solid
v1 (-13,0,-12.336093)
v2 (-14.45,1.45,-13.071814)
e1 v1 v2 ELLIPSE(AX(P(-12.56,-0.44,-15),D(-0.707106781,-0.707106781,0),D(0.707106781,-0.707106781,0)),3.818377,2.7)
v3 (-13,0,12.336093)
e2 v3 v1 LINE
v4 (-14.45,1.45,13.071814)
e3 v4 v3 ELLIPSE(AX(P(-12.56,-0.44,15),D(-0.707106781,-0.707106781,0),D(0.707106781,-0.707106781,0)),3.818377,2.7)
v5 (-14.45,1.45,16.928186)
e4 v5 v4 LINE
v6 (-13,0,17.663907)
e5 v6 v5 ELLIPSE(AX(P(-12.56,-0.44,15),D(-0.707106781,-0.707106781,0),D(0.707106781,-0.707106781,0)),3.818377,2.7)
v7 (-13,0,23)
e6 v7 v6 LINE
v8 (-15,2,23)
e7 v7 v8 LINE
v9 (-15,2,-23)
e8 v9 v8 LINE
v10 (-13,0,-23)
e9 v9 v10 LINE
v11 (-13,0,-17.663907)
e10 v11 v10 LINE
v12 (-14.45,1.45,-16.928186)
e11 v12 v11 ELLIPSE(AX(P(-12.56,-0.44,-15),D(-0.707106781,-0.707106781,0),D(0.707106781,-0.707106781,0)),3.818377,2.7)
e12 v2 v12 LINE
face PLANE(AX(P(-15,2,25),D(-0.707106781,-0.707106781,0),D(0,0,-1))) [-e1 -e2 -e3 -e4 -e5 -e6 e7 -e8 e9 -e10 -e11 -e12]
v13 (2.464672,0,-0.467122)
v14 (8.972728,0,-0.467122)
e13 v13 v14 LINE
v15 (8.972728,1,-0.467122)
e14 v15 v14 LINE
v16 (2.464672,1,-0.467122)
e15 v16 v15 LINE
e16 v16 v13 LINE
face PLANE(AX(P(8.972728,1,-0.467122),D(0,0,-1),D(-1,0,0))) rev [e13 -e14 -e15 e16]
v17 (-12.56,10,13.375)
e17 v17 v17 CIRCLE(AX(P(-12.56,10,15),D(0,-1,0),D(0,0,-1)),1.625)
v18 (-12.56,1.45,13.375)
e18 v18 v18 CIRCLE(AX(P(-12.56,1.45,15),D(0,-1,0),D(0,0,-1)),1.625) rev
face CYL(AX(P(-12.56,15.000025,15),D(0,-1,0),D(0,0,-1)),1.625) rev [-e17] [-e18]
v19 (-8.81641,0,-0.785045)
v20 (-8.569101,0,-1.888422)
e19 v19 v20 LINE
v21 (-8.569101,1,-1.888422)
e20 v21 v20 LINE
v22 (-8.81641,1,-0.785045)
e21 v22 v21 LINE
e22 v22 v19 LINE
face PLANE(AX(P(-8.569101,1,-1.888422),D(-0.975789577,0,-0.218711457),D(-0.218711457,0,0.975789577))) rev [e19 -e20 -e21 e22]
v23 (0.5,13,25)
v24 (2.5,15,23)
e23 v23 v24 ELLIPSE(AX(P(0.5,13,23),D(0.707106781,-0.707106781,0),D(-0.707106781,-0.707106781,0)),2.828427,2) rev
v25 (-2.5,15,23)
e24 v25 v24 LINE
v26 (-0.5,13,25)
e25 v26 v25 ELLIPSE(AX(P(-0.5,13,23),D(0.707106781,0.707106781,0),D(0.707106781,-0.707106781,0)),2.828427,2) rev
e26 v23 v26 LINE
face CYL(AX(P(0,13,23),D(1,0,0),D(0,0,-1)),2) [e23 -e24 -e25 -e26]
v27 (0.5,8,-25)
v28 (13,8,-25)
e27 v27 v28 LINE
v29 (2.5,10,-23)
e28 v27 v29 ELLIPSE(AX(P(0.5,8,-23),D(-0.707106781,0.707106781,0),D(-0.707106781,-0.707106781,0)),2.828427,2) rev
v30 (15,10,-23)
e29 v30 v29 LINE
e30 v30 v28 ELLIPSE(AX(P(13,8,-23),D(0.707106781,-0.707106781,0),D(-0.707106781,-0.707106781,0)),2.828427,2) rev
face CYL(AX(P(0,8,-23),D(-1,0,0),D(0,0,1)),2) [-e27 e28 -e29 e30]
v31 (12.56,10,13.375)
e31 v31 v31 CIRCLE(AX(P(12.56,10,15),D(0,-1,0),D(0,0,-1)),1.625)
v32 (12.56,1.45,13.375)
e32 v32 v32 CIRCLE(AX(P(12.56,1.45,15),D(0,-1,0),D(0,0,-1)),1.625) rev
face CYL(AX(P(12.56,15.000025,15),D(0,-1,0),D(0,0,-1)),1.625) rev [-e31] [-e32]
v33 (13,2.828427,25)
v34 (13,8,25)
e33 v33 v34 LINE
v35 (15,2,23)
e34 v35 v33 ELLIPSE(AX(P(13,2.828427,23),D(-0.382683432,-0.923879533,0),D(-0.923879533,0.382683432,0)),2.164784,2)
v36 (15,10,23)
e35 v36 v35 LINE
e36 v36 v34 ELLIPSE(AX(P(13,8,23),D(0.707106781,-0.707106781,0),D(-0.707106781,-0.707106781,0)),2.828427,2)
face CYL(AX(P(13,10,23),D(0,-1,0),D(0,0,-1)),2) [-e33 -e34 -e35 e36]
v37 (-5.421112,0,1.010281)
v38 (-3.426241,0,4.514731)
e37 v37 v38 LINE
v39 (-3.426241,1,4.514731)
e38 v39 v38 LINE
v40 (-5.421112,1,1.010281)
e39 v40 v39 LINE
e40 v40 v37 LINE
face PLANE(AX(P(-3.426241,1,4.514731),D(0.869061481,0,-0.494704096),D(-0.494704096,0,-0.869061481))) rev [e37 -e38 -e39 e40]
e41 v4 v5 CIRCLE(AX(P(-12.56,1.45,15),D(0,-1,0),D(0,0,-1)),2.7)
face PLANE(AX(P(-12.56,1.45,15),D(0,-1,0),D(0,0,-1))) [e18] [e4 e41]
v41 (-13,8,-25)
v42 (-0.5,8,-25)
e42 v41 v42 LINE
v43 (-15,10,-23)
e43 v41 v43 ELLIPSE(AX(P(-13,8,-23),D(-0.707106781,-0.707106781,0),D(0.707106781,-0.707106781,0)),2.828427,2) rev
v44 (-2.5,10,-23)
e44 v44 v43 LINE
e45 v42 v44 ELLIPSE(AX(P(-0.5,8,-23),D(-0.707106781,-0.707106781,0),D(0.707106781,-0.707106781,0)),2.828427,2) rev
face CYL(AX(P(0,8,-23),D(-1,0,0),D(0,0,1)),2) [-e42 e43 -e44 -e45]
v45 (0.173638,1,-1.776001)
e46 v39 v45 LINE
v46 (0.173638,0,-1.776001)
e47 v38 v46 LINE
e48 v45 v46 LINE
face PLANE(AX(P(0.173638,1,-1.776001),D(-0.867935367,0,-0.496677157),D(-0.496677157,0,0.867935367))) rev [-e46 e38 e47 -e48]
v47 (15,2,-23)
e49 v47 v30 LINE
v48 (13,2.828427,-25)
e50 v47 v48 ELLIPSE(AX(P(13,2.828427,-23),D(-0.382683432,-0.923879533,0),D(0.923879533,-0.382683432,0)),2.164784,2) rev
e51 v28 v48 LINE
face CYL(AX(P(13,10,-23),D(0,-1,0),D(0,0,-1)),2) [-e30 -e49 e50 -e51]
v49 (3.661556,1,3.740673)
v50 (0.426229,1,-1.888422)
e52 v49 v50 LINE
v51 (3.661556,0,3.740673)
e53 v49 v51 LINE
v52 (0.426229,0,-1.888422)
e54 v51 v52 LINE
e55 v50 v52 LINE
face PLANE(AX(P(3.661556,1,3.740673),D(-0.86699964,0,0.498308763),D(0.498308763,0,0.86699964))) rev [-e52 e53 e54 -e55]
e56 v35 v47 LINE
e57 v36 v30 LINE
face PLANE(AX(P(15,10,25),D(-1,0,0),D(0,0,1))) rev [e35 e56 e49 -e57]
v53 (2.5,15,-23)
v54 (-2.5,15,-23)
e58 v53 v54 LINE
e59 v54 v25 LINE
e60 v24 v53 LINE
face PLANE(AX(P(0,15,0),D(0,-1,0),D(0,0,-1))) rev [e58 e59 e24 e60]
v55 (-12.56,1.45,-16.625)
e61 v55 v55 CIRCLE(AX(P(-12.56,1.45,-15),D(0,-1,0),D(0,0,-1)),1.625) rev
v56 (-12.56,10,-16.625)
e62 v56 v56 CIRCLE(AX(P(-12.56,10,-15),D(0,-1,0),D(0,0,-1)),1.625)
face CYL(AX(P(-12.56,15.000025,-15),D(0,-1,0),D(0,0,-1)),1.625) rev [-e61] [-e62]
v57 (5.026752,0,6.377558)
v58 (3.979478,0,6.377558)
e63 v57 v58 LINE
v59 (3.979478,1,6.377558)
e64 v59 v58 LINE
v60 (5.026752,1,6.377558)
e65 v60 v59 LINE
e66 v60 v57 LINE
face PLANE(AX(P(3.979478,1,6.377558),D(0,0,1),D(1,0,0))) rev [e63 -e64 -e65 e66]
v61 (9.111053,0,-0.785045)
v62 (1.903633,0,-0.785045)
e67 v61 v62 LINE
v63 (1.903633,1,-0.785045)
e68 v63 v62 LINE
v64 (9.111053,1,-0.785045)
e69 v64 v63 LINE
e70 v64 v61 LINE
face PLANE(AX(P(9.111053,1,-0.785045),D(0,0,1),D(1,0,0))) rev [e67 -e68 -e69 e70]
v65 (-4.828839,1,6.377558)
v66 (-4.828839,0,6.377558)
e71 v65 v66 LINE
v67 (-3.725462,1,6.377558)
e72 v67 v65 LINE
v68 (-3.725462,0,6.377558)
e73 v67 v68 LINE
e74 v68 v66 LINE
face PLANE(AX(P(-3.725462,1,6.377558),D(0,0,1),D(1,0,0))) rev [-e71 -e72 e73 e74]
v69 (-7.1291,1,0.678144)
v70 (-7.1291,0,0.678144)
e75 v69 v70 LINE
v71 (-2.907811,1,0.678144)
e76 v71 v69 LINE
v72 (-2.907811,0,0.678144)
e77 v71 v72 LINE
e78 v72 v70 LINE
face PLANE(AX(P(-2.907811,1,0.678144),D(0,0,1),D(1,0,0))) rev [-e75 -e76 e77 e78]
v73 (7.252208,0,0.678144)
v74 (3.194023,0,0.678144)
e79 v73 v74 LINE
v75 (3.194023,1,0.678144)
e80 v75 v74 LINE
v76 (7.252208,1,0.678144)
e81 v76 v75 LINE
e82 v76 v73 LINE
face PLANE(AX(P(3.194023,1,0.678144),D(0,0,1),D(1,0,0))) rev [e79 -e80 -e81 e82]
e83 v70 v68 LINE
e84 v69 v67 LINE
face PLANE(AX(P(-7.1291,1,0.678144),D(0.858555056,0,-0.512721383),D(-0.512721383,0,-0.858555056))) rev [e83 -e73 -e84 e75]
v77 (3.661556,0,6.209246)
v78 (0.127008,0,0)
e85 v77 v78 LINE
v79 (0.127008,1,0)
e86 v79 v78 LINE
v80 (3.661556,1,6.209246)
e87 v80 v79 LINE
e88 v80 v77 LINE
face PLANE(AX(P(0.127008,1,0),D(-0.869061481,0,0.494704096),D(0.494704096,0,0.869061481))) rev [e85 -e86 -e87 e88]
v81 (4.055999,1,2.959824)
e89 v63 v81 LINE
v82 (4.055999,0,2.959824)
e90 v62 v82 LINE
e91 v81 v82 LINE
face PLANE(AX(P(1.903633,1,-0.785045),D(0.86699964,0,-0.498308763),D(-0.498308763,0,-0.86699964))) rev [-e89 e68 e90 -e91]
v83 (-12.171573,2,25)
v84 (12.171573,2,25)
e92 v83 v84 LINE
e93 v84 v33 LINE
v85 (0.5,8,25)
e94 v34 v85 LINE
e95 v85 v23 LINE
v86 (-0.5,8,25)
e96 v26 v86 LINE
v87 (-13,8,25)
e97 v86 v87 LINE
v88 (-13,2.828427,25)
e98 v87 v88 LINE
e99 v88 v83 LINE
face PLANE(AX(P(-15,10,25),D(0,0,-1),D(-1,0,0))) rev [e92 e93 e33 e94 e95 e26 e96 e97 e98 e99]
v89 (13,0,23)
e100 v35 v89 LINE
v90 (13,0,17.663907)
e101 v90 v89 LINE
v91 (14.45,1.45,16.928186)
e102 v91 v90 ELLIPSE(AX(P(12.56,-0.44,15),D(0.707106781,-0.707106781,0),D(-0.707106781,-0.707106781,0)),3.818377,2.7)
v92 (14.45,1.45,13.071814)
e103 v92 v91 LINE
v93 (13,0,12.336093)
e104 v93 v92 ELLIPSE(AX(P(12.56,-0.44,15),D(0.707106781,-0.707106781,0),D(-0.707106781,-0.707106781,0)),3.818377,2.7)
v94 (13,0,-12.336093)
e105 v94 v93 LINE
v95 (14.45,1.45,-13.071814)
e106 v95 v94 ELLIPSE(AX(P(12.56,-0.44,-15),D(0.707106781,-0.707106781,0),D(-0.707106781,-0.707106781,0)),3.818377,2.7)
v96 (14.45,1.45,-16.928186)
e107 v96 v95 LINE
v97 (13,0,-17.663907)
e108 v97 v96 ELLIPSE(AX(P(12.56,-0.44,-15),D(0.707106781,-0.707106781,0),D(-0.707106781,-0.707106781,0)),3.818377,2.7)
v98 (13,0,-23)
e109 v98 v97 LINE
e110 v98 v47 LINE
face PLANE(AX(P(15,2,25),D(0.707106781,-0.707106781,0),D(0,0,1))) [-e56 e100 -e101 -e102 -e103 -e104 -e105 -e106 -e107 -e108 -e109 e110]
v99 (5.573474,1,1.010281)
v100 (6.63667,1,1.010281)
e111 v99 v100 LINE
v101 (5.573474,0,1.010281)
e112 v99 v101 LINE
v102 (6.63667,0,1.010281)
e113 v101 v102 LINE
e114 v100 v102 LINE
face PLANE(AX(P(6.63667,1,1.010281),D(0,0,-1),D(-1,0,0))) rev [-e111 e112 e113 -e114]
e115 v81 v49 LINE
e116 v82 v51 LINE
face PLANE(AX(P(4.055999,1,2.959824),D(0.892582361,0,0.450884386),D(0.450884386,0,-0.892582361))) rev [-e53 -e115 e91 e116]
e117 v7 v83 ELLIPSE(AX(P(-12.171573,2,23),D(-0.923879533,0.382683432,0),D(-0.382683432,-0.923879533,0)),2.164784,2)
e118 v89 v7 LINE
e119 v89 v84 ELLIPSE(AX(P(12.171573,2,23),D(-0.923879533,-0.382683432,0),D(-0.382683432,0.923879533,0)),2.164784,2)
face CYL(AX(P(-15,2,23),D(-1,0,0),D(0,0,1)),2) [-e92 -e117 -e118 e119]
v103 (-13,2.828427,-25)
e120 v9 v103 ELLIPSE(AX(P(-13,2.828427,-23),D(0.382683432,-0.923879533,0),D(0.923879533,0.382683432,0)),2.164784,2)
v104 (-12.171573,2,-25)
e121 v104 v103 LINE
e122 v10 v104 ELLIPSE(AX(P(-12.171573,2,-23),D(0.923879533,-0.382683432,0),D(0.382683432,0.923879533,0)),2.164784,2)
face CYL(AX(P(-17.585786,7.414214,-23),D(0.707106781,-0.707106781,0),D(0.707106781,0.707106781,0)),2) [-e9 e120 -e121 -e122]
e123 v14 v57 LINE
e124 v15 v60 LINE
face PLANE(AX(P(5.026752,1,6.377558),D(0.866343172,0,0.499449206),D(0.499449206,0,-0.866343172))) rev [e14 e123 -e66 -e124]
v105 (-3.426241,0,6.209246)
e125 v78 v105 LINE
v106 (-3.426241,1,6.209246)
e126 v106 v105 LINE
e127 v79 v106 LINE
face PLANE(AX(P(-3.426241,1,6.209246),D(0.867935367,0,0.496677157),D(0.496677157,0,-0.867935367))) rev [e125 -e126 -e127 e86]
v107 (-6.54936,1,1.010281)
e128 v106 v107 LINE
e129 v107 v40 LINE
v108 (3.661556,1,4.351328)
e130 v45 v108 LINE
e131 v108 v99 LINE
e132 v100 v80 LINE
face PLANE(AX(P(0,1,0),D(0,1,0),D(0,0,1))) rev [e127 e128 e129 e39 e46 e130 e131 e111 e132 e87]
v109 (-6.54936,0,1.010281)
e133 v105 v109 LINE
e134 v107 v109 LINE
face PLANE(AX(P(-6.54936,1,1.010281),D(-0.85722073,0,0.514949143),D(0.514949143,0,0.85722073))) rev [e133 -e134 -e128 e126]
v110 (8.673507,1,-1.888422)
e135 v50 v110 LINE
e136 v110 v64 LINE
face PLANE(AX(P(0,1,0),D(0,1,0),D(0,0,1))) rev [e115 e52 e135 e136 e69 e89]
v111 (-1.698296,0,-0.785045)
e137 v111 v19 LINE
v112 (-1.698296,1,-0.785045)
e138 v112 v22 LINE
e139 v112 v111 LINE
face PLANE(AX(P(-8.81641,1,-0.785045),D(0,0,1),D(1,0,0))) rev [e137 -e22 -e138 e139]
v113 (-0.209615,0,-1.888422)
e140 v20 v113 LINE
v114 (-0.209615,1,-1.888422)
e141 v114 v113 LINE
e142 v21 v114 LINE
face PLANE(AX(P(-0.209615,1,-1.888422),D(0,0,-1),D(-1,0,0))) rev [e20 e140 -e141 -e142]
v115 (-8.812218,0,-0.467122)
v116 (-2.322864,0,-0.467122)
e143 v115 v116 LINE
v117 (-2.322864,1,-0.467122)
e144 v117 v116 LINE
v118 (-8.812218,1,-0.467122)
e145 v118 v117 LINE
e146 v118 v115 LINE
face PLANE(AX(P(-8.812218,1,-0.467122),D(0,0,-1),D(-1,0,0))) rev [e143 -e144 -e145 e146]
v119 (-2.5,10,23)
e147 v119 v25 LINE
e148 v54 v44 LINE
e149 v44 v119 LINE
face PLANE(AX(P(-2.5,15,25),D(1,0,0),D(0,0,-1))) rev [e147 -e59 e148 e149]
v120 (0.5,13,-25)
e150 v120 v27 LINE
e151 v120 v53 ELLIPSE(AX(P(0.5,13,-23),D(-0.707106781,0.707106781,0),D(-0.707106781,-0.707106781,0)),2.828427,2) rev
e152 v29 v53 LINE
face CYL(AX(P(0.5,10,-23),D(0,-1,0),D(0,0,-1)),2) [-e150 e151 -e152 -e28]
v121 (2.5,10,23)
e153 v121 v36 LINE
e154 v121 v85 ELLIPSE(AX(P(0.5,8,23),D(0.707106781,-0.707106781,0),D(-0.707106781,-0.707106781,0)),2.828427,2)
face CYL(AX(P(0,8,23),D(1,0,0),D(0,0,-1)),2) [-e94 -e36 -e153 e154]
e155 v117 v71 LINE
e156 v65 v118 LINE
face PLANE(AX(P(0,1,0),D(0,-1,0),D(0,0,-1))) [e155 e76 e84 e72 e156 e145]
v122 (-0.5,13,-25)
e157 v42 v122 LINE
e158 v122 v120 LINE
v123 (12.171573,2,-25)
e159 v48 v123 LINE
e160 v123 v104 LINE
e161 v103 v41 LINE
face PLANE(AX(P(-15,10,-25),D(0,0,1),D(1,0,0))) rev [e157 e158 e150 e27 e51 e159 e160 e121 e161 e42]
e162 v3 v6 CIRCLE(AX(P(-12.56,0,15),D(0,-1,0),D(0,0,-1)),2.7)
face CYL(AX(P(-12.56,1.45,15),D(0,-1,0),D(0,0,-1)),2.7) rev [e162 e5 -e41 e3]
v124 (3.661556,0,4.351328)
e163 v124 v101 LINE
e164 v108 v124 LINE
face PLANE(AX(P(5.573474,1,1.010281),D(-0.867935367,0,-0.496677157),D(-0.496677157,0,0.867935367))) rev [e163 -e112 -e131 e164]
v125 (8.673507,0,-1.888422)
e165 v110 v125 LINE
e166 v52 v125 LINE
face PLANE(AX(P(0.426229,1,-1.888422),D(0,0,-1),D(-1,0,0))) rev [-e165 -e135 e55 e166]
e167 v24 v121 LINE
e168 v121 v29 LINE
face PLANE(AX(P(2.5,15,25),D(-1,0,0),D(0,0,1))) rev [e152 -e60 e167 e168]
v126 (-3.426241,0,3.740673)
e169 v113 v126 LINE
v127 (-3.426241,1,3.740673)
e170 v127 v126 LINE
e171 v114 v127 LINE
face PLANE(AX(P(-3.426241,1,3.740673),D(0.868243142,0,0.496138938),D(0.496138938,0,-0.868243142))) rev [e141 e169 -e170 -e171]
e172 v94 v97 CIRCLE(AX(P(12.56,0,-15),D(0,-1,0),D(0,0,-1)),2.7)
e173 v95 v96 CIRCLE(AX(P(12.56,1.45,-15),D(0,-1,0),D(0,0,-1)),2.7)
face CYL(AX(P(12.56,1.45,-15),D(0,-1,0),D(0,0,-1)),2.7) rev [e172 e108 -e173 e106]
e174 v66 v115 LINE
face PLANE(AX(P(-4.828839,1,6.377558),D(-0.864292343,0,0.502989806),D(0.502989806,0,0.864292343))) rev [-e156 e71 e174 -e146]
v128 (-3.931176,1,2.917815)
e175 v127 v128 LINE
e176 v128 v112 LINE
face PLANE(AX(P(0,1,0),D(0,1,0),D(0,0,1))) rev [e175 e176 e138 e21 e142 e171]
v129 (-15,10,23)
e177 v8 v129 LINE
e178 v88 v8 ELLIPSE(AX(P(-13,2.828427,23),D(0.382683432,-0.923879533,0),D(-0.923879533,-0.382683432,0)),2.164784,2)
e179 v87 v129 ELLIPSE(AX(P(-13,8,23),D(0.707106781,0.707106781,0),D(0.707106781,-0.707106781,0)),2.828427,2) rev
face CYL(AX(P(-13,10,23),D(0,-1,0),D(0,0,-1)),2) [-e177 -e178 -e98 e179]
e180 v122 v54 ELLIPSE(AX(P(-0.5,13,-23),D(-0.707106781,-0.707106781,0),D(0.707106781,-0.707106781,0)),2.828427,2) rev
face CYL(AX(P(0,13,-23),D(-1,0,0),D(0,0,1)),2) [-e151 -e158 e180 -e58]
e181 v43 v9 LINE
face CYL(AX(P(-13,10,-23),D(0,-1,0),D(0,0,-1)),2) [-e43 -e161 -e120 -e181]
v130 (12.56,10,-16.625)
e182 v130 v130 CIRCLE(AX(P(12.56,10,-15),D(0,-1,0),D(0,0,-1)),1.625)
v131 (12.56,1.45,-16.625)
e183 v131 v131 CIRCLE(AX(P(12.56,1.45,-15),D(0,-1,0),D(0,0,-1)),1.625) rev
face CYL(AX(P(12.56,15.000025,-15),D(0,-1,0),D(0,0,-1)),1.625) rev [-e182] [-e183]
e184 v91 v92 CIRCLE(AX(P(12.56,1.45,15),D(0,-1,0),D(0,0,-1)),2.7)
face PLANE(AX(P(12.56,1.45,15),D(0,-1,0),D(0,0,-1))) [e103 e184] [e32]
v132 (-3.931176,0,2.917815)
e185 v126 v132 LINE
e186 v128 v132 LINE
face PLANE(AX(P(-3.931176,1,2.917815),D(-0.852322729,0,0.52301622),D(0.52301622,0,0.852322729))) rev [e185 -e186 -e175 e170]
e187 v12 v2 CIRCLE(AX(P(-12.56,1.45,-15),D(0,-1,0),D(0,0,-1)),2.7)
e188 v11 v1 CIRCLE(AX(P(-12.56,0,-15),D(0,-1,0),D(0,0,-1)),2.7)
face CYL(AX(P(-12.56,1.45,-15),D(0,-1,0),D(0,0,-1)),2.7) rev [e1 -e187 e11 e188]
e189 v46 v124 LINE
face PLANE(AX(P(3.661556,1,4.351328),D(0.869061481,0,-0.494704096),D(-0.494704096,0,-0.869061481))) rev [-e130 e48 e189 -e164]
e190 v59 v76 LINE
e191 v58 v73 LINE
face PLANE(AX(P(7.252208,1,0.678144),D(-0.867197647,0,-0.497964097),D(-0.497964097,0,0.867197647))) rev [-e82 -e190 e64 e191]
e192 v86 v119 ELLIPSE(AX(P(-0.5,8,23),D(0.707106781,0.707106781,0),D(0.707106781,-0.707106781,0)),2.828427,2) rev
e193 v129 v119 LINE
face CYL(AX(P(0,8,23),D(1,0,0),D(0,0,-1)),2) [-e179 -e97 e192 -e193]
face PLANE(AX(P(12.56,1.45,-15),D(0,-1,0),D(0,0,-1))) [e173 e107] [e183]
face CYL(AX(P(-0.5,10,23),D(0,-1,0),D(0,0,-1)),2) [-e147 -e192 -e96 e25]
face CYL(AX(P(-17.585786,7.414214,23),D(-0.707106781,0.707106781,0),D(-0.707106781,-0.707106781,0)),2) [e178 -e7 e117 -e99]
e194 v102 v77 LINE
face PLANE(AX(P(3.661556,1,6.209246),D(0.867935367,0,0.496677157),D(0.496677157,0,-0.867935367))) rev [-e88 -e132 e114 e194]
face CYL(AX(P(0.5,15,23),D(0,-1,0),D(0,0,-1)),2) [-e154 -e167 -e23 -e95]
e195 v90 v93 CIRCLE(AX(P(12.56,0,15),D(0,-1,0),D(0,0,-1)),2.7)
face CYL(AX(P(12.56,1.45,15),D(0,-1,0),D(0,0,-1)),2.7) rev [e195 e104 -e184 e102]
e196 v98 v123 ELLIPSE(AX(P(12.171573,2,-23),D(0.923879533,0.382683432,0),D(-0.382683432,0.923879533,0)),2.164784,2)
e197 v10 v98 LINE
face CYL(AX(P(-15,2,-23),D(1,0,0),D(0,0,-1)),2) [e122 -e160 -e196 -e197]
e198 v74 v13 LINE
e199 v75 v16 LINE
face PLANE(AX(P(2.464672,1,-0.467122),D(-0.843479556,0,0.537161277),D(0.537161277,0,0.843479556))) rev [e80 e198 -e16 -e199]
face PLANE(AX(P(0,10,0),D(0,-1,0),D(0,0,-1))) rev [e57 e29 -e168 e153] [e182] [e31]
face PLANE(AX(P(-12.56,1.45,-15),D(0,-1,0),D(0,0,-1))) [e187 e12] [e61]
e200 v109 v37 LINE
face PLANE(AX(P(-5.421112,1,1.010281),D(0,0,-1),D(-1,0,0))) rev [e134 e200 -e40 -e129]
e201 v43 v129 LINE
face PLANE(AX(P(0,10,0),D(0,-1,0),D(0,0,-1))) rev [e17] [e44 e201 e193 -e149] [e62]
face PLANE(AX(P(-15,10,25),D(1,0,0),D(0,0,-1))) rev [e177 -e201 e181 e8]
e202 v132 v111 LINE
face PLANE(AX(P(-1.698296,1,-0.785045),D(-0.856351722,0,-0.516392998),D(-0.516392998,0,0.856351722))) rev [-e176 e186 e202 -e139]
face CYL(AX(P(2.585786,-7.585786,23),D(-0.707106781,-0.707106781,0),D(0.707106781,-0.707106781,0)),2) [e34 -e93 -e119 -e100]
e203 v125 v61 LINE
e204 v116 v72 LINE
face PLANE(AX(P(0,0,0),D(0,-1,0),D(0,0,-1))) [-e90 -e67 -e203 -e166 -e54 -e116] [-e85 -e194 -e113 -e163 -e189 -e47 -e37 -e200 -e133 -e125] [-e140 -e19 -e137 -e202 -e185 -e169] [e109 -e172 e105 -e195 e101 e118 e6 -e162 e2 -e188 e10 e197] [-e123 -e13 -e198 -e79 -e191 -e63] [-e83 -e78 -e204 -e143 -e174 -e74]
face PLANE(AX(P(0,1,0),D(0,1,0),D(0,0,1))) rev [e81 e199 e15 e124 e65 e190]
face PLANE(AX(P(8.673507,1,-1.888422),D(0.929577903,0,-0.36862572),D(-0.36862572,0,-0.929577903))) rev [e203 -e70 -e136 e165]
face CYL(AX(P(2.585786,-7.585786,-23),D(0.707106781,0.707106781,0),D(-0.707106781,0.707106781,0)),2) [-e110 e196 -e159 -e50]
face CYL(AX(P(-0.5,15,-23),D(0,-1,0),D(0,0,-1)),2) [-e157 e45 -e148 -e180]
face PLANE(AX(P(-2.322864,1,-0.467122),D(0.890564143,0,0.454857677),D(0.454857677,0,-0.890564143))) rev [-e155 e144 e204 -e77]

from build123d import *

# Parameters (mm, degrees)
SKETCH1_W           = 30
SKETCH1_H           = 50
BOSS_EXTRUDE1_DEPTH = 10
SKETCH2_W           = 5
SKETCH2_H           = 50
BOSS_EXTRUDE2_DEPTH = 5
SKETCH3_R           = 1.625
CUT_EXTRUDE1_DEPTH  = 33.787192622
SKETCH4_R           = 2.7
CUT_EXTRUDE2_DEPTH  = 1.45
CHAMFER1_SIZE       = 2
CHAMFER2_SIZE       = 2
FILLET1_R           = 2
FILLET2_R           = 2
CUT_EXTRUDE6_DEPTH  = 1


with BuildPart() as part:
    # Sketch1 → Boss-Extrude1 (new body)
    with BuildSketch(Plane(origin=(0, 0, 0), x_dir=(1, 0, 0), z_dir=(0, 1, 0))):
        Rectangle(SKETCH1_W, SKETCH1_H)
    extrude(amount=BOSS_EXTRUDE1_DEPTH)

    # Sketch2 → Boss-Extrude2 (add)
    with BuildSketch(Plane(origin=(0, 10, 0), x_dir=(1, 0, 0), z_dir=(0, 1, 0))):
        Rectangle(SKETCH2_W, SKETCH2_H)
    extrude(amount=BOSS_EXTRUDE2_DEPTH)

    # Sketch3 → Cut-Extrude1 (cut, through all)
    with BuildSketch(Plane.XZ):
        with Locations(Location((-12.56, 15, 0), (0, 0, 270))):
            Circle(SKETCH3_R)
        with Locations(Location((-12.56, -15, 0), (0, 0, 270))):
            Circle(SKETCH3_R)
        with Locations(Location((12.56, -15, 0), (0, 0, 270))):
            Circle(SKETCH3_R)
        with Locations(Location((12.56, 15, 0), (0, 0, 270))):
            Circle(SKETCH3_R)
    extrude(amount=-CUT_EXTRUDE1_DEPTH, mode=Mode.SUBTRACT)

    # Sketch4 → Cut-Extrude2 (cut)
    with BuildSketch(Plane.XZ):
        with Locations((-12.56, 15)):
            Circle(SKETCH4_R)
        with Locations((-12.56, -15)):
            Circle(SKETCH4_R)
        with Locations((12.56, -15)):
            Circle(SKETCH4_R)
        with Locations((12.56, 15)):
            Circle(SKETCH4_R)
    extrude(amount=-CUT_EXTRUDE2_DEPTH, mode=Mode.SUBTRACT)

    # Chamfer1
    # the kernel refuses this chamfer: 2 mm, written as the material it takes off along each edge
    with BuildSketch(Plane(origin=(-15, 0, -30.143365976), x_dir=(0.9996219169112968, -0.027495876610586365, 0), z_dir=(0, 0, 1)), Plane(origin=(-15, 0, 11.012661705), x_dir=(0.9996219169112968, -0.027495876610586365, 0), z_dir=(0, 0, 1))) as chamfer1_piece_1:
        Polygon((CHAMFER1_SIZE * 0.999621916911, CHAMFER1_SIZE * 0.0274958766106), (-CHAMFER1_SIZE * 0.0274958766106, CHAMFER1_SIZE * 0.999621916911), (0, 0), align=None)
    extrude(amount=19.130704271, mode=Mode.SUBTRACT)
    with BuildSketch(Plane(origin=(-15, 0, -18.987338295), x_dir=(0.9996219169112968, -0.027495876610586365, 0), z_dir=(0, 0, 1))) as chamfer1_piece_2:
        Polygon((CHAMFER1_SIZE * 0.999621916911, CHAMFER1_SIZE * 0.0274958766106), (-CHAMFER1_SIZE * 0.0274958766106, CHAMFER1_SIZE * 0.999621916911), (0, 0), align=None)
    extrude(amount=37.974676589, mode=Mode.SUBTRACT)

    # Chamfer2
    # the kernel refuses this chamfer: 2 mm, written as the material it takes off along each edge
    with BuildSketch(Plane(origin=(15, 0, 30.143365976), x_dir=(0.027495876610586494, 0.9996219169112968, 0), z_dir=(0, 0, -1)), Plane(origin=(15, 0, -11.012661705), x_dir=(0.027495876610586494, 0.9996219169112968, 0), z_dir=(0, 0, -1))) as chamfer2_piece_1:
        Polygon((CHAMFER2_SIZE * 0.999621916911, -CHAMFER2_SIZE * 0.0274958766106), (-CHAMFER2_SIZE * 0.0274958766106, -CHAMFER2_SIZE * 0.999621916911), (0, 0), align=None)
    extrude(amount=19.130704271, mode=Mode.SUBTRACT)
    with BuildSketch(Plane(origin=(15, 0, 18.987338295), x_dir=(0.027495876610586494, 0.9996219169112968, 0), z_dir=(0, 0, -1))) as chamfer2_piece_2:
        Polygon((CHAMFER2_SIZE * 0.999621916911, -CHAMFER2_SIZE * 0.0274958766106), (-CHAMFER2_SIZE * 0.0274958766106, -CHAMFER2_SIZE * 0.999621916911), (0, 0), align=None)
    extrude(amount=37.974676589, mode=Mode.SUBTRACT)

    # Fillet1
    fillet1_edges = [part.edges().sort_by_distance(p)[0] for p in [
        (-14, 1, 25),
        (-15, 6, 25),
        (-8.75, 10, 25),
        (-2.5, 12.5, 25),
        (0, 15, 25),
        (2.5, 12.5, 25),
        (8.75, 10, 25),
        (15, 6, 25),
        (14, 1, 25),
        (0, 0, 25),
    ]]
    fillet(fillet1_edges, radius=FILLET1_R)

    # Fillet2
    fillet2_edges = [part.edges().sort_by_distance(p)[0] for p in [
        (8.75, 10, -25),
        (2.5, 12.5, -25),
        (0, 15, -25),
        (-2.5, 12.5, -25),
        (-8.75, 10, -25),
        (-15, 6, -25),
        (-14, 1, -25),
        (0, 0, -25),
        (14, 1, -25),
        (15, 6, -25),
    ]]
    fillet(fillet2_edges, radius=FILLET2_R)

    # Mobious Logo → Cut-Extrude6 (cut)
    with BuildSketch(Plane.XZ):
        Polygon((-3.725461883, 6.377557531), (-4.828839221, 6.377557531), (-8.812218423, -0.467122224), (-2.322863572, -0.467122224), (-2.907811009, 0.678144172), (-7.12910045, 0.678144172), align=None)
        Polygon((-3.931176302, 2.917815032), (-3.42624091, 3.740672707), (-0.209615451, -1.888421846), (-8.569101382, -1.888421846), (-8.816410096, -0.785044508), (-1.698296177, -0.785044508), align=None)
        Polygon((-6.549359815, 1.01028133), (-3.42624091, 6.209245734), (0.127008143, 0), (3.661555886, 6.209245734), (6.636670117, 1.01028133), (5.573474433, 1.01028133), (3.661555886, 4.351328327), (0.173638389, -1.77600066), (-3.42624091, 4.514730681), (-5.421111797, 1.01028133), align=None)
        Polygon((3.97947817, 6.377557531), (5.026751575, 6.377557531), (8.972728155, -0.467122224), (2.464671994, -0.467122224), (3.194023116, 0.678144172), (7.252207561, 0.678144172), align=None)
        Polygon((3.661555886, 3.740672707), (0.426229116, -1.888421846), (8.673507182, -1.888421846), (9.111053368, -0.785044508), (1.90363267, -0.785044508), (4.055998695, 2.959823548), align=None)
    extrude(amount=-CUT_EXTRUDE6_DEPTH, mode=Mode.SUBTRACT)


solid = part.part
